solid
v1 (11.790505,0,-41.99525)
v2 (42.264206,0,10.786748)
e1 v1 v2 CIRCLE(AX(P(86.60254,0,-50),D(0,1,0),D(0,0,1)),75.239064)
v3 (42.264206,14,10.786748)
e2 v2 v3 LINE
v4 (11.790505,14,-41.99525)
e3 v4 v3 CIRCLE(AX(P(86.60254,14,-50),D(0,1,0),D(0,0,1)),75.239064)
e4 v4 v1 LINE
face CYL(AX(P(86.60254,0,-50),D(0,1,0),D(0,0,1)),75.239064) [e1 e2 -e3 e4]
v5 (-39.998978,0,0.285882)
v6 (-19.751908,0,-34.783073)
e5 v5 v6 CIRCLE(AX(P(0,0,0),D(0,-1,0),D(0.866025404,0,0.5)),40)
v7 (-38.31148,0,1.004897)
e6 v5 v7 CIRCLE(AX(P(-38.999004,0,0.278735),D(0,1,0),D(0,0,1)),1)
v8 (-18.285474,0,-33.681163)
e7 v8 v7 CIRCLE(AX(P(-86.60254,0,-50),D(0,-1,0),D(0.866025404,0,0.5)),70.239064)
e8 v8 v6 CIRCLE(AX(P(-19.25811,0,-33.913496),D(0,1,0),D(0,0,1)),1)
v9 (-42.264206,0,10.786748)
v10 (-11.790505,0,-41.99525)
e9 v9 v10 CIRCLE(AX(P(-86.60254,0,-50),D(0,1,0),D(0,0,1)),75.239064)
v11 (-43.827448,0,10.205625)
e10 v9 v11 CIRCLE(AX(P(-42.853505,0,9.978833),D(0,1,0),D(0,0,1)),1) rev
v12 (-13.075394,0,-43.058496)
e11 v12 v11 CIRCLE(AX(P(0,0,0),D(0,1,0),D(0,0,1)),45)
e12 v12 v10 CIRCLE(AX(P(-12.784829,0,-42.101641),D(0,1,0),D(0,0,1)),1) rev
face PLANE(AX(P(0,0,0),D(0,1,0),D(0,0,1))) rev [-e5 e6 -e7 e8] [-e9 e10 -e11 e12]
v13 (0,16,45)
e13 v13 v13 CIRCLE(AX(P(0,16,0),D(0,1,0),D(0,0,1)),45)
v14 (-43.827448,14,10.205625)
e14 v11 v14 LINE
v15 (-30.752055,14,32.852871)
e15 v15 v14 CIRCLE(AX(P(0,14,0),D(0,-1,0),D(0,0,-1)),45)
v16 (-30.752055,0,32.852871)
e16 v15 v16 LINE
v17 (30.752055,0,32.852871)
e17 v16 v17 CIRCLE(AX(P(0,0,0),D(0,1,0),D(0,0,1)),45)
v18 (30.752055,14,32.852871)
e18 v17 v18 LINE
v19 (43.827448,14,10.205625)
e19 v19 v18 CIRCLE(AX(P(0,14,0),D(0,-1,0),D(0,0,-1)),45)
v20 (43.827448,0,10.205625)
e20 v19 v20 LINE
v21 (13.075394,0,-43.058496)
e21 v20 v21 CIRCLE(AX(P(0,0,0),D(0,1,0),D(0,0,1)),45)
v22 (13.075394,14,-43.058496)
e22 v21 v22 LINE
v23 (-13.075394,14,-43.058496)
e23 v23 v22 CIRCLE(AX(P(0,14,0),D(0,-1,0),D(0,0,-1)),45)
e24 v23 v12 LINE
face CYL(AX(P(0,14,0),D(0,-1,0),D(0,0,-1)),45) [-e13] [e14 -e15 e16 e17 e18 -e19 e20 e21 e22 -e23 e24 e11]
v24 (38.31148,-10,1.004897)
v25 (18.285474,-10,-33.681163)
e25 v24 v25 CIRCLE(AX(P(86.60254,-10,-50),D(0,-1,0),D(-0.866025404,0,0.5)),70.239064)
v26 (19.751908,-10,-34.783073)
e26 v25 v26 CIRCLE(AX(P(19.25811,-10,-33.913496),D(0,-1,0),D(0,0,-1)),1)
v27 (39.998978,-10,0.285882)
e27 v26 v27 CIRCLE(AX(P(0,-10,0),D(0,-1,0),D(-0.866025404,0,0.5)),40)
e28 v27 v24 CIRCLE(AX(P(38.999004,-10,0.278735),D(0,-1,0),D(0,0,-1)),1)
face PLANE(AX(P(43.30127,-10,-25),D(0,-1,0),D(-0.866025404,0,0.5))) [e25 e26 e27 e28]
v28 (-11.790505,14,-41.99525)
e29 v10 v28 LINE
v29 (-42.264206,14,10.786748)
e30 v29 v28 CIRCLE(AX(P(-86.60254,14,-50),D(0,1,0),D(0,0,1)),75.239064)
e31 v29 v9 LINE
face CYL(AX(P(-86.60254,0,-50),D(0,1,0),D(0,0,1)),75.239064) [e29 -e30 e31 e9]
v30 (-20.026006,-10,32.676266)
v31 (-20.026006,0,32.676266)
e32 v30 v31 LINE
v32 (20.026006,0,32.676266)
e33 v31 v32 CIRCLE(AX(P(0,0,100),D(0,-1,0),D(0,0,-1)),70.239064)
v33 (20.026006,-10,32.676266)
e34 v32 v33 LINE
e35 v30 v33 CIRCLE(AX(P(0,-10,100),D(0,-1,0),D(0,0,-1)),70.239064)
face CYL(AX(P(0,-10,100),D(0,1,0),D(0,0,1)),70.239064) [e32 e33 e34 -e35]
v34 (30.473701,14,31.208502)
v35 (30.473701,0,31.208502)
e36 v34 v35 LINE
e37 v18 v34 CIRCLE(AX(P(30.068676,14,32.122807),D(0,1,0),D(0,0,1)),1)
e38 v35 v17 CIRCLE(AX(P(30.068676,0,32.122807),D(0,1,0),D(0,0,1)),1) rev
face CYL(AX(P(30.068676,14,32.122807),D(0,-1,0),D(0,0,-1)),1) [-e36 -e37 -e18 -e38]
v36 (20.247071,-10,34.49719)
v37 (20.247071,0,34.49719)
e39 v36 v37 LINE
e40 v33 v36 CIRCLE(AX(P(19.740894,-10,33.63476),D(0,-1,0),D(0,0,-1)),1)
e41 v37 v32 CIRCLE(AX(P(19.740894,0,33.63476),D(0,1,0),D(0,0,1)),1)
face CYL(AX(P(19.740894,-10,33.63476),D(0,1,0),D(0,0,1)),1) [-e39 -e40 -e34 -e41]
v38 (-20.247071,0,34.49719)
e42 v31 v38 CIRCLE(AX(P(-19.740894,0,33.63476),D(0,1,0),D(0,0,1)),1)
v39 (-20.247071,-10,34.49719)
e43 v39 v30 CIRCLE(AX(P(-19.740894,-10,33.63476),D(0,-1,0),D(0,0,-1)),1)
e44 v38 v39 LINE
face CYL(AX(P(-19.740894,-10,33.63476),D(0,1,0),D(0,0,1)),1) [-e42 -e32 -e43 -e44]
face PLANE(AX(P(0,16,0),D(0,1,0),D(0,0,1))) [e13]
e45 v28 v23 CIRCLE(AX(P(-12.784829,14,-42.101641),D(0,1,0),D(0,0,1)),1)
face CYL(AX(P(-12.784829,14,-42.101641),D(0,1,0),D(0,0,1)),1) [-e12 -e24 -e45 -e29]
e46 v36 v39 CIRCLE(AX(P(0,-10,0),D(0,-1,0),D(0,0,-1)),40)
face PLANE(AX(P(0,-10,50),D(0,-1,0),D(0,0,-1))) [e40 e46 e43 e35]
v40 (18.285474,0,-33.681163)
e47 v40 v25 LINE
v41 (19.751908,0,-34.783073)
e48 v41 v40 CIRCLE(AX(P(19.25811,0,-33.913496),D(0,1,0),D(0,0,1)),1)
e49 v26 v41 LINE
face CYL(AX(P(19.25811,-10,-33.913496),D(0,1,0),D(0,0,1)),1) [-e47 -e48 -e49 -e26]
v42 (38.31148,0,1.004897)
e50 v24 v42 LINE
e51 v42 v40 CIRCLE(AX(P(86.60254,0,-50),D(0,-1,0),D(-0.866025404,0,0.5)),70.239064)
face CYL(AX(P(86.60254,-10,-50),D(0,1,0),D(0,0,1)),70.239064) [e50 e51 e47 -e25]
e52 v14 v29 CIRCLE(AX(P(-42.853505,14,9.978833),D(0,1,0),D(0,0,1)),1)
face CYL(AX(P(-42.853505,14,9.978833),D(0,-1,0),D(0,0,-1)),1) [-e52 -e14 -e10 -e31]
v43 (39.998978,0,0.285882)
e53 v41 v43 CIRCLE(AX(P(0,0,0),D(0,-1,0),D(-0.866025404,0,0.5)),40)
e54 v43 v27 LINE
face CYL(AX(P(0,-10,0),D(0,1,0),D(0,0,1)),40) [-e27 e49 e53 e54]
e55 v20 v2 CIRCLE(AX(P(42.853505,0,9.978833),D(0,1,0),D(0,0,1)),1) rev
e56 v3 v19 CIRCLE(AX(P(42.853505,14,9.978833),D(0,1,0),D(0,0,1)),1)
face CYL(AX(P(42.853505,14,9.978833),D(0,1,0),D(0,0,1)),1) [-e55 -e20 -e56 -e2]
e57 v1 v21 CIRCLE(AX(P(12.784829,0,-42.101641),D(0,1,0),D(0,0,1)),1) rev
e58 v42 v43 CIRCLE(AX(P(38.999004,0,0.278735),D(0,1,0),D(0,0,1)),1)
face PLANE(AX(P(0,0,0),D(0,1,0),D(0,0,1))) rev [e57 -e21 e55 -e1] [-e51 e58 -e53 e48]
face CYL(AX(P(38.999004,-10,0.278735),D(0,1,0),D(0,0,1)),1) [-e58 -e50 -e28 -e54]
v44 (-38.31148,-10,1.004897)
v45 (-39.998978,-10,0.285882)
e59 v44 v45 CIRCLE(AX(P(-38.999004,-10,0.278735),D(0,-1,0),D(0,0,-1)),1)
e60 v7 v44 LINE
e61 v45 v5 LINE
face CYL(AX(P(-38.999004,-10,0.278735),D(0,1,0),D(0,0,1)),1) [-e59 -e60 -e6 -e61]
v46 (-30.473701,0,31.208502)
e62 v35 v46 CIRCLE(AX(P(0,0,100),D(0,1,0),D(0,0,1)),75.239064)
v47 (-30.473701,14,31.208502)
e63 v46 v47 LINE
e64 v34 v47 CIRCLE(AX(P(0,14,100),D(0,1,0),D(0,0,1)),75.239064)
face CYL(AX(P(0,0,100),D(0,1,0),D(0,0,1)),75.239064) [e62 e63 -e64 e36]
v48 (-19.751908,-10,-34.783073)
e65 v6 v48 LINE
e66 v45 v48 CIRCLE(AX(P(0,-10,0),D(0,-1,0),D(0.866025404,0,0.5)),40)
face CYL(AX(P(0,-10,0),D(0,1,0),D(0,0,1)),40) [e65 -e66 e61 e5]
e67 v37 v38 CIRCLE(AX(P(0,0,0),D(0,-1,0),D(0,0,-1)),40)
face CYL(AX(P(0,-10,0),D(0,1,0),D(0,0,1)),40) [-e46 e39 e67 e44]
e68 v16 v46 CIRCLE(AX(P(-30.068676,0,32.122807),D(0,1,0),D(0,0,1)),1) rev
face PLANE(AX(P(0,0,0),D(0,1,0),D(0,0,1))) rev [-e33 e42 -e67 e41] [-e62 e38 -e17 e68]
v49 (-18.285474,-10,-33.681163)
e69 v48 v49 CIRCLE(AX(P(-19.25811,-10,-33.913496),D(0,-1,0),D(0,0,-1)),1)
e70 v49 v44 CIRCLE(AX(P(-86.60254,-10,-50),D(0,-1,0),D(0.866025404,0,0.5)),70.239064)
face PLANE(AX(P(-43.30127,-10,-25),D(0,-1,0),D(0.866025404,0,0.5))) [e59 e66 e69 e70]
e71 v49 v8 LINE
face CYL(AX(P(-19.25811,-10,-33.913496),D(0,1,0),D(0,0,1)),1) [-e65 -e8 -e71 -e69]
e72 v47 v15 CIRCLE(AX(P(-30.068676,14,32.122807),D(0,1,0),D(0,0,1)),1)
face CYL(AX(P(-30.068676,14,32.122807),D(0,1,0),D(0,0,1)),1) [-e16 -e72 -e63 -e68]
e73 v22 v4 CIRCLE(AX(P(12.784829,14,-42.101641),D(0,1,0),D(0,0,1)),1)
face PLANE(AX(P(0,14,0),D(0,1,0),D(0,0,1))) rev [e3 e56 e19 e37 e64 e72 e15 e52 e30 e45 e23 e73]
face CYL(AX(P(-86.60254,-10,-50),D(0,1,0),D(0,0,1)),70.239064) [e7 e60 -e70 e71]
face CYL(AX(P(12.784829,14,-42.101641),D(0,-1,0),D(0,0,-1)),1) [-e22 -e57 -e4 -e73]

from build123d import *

# Parameters (mm, degrees)
SKETCH1_R                = 37.5
BOSS_EXTRUDE1_DEPTH      = 14
CUT_EXTRUDE2_START       = -14
CUT_EXTRUDE2_DEPTH       = 14
SKETCH4_R                = 45
SKETCH4_R_2              = 37.5
BOSS_EXTRUDE2_DEPTH      = 14
SKETCH6_R                = 45
BOSS_EXTRUDE3_DEPTH      = 2
SKETCH7_R                = 1.75
CUT_EXTRUDE3_DEPTH       = 66.620118866
CIRPATTERN2_COUNT        = 3
BOSS_EXTRUDE4_DEPTH      = 10
FILLET1_R                = 1
CIRPATTERN3_COUNT        = 3
FILLET1_OF_CIRPATTERN3_R = 1
CUT_EXTRUDE4_DEPTH       = 69.01470446
FILLET2_R                = 1
SKETCH15_R               = 45
BOSS_EXTRUDE5_DEPTH      = 2


# Read off the part's stored shape, not the designer's step: Cut-Extrude2
with BuildPart() as part:
    # Sketch1 → Boss-Extrude1 (new body)
    with BuildSketch(Plane(origin=(0, 0, 0), x_dir=(1, 0, 0), z_dir=(0, 1, 0))):
        with Locations(Location((0, 0, 0), (0, 0, 270))):
            Circle(SKETCH1_R)
    extrude(amount=BOSS_EXTRUDE1_DEPTH)

    # Cut-Extrude2 outline → Cut-Extrude2 (cut)
    with BuildSketch(Plane(origin=(0, 14, 0), x_dir=(1, 0, 0), z_dir=(0, 1, 0)).offset(CUT_EXTRUDE2_START)):
        with BuildLine():
            ThreePointArc((-24.104535363, -28.726666617), (0, -24.760936498), (24.104535363, -28.726666617))
            ThreePointArc((24.104535363, -28.726666617), (32.475952642, -18.75), (36.930290738, -6.511806663))
            ThreePointArc((36.930290738, -6.511806663), (21.443600029, 12.380468249), (12.825755375, 35.238473279))
            ThreePointArc((12.825755375, 35.238473279), (0, 37.5), (-12.825755375, 35.238473279))
            ThreePointArc((-12.825755375, 35.238473279), (-21.443600029, 12.380468249), (-36.930290738, -6.511806663))
            ThreePointArc((-36.930290738, -6.511806663), (-32.475952642, -18.75), (-24.104535363, -28.726666617))
        make_face()
    extrude(amount=CUT_EXTRUDE2_DEPTH, mode=Mode.SUBTRACT)

    # Sketch4 → Boss-Extrude2 (add)
    with BuildSketch(Plane(origin=(0, 0, 0), x_dir=(1, 0, 0), z_dir=(0, 1, 0))):
        with Locations(Location((0, 0, 0), (0, 0, 270))):
            Circle(SKETCH4_R)
        Circle(SKETCH4_R_2, mode=Mode.SUBTRACT)
    extrude(amount=BOSS_EXTRUDE2_DEPTH)

    # Sketch6 → Boss-Extrude3 (add)
    with BuildSketch(Plane(origin=(0, 14, 0), x_dir=(1, 0, 0), z_dir=(0, 1, 0))):
        with Locations(Location((0, 0, 0), (0, 0, 270))):
            Circle(SKETCH6_R)
        with BuildLine():
            ThreePointArc((-28.952849653, 1.653026611), (-25.11473671, -14.5), (-13.044861788, -25.900416617))
            ThreePointArc((-13.044861788, -25.900416617), (0, -24.760936498), (13.044861788, -25.900416617))
            ThreePointArc((13.044861788, -25.900416617), (25.11473671, -14.5), (28.952849653, 1.653026611))
            ThreePointArc((28.952849653, 1.653026611), (21.443600029, 12.380468249), (15.907987865, 24.247390006))
            ThreePointArc((15.907987865, 24.247390006), (0, 29), (-15.907987865, 24.247390006))
            ThreePointArc((-15.907987865, 24.247390006), (-21.443600029, 12.380468249), (-28.952849653, 1.653026611))
        make_face(mode=Mode.SUBTRACT)
    extrude(amount=BOSS_EXTRUDE3_DEPTH)

    # Sketch7 → Cut-Extrude3 (cut, through all)
    with BuildSketch(Plane(origin=(0, 16, 0), x_dir=(1, 0, 0), z_dir=(0, 1, 0))):
        with Locations(Location((0, 32, 0), (0, 0, 270))):
            Circle(SKETCH7_R)
    cut_extrude3 = extrude(amount=-CUT_EXTRUDE3_DEPTH, mode=Mode.SUBTRACT)

    # CirPattern2: Cut-Extrude3 ×3 about axis
    cirpattern2_axis = Axis((0, 0, 0), (0, 1, 0))
    for i in range(1, CIRPATTERN2_COUNT):
        add(cut_extrude3.rotate(cirpattern2_axis, i * 360 / CIRPATTERN2_COUNT), mode=Mode.SUBTRACT)

    # Sketch13 → Boss-Extrude4 (add)
    with BuildSketch(Plane.XZ):
        with BuildLine():
            ThreePointArc((-22.11228446, 33.332369792), (0, 29.760936498), (22.11228446, 33.332369792))
            ThreePointArc((22.11228446, 33.332369792), (0, 40), (-22.11228446, 33.332369792))
        make_face()
    boss_extrude4 = extrude(amount=BOSS_EXTRUDE4_DEPTH)

    # Fillet1
    fillet1_edges = [part.edges().sort_by_distance(p)[0] for p in [
        (22.11228446, -5, 33.332369792),
        (-22.11228446, -5, 33.332369792),
    ]]
    fillet(fillet1_edges, radius=FILLET1_R)

    # CirPattern3: Boss-Extrude4 ×3 about axis
    cirpattern3_axis = Axis((0, 0, 0), (0, 1, 0))
    for i in range(1, CIRPATTERN3_COUNT):
        add(boss_extrude4.rotate(cirpattern3_axis, i * 360 / CIRPATTERN3_COUNT))

    # Fillet1 of CirPattern3
    fillet1_of_cirpattern3_edges = [part.edges().sort_by_distance(p)[0] for p in [
        (17.810536778, -5, -35.815984974),
        (39.922821238, -5, 2.483615182),
        (-39.922821238, -5, 2.483615182),
        (-17.810536778, -5, -35.815984974),
    ]]
    fillet(fillet1_of_cirpattern3_edges, radius=FILLET1_OF_CIRPATTERN3_R)

    # Sketch14 → Cut-Extrude4 (cut, through all)
    with BuildSketch(Plane.XZ.offset(-14)):
        with BuildLine():
            Line((-33.206244265, 32.485097805), (-44.736042076, 12.514902195))
            ThreePointArc((-44.736042076, 12.514902195), (-21.443600029, -12.380468249), (-11.529797811, -45))
            Line((-11.529797811, -45), (11.529797811, -45))
            ThreePointArc((11.529797811, -45), (21.443600029, -12.380468249), (44.736042076, 12.514902195))
            Line((44.736042076, 12.514902195), (33.206244265, 32.485097805))
            ThreePointArc((33.206244265, 32.485097805), (0, 24.760936498), (-33.206244265, 32.485097805))
        make_face()
    extrude(amount=CUT_EXTRUDE4_DEPTH, mode=Mode.SUBTRACT)

    # Fillet2
    fillet2_edges = [part.edges().sort_by_distance(p)[0] for p in [
        (43.466885988, 7, 11.646021745),
        (11.64769231, 7, -43.466438362),
        (-31.819193678, 7, 31.820416617),
        (31.819193678, 7, 31.820416617),
        (-11.64769231, 7, -43.466438362),
        (-43.466885988, 7, 11.646021745),
    ]]
    fillet(fillet2_edges, radius=FILLET2_R)

    # Sketch15 → Boss-Extrude5 (add)
    with BuildSketch(Plane.XZ.offset(-14)):
        with Locations(Location((0, 0, 0), (0, 0, 253.108257002))):
            Circle(SKETCH15_R)
    extrude(amount=-BOSS_EXTRUDE5_DEPTH)


solid = part.part
